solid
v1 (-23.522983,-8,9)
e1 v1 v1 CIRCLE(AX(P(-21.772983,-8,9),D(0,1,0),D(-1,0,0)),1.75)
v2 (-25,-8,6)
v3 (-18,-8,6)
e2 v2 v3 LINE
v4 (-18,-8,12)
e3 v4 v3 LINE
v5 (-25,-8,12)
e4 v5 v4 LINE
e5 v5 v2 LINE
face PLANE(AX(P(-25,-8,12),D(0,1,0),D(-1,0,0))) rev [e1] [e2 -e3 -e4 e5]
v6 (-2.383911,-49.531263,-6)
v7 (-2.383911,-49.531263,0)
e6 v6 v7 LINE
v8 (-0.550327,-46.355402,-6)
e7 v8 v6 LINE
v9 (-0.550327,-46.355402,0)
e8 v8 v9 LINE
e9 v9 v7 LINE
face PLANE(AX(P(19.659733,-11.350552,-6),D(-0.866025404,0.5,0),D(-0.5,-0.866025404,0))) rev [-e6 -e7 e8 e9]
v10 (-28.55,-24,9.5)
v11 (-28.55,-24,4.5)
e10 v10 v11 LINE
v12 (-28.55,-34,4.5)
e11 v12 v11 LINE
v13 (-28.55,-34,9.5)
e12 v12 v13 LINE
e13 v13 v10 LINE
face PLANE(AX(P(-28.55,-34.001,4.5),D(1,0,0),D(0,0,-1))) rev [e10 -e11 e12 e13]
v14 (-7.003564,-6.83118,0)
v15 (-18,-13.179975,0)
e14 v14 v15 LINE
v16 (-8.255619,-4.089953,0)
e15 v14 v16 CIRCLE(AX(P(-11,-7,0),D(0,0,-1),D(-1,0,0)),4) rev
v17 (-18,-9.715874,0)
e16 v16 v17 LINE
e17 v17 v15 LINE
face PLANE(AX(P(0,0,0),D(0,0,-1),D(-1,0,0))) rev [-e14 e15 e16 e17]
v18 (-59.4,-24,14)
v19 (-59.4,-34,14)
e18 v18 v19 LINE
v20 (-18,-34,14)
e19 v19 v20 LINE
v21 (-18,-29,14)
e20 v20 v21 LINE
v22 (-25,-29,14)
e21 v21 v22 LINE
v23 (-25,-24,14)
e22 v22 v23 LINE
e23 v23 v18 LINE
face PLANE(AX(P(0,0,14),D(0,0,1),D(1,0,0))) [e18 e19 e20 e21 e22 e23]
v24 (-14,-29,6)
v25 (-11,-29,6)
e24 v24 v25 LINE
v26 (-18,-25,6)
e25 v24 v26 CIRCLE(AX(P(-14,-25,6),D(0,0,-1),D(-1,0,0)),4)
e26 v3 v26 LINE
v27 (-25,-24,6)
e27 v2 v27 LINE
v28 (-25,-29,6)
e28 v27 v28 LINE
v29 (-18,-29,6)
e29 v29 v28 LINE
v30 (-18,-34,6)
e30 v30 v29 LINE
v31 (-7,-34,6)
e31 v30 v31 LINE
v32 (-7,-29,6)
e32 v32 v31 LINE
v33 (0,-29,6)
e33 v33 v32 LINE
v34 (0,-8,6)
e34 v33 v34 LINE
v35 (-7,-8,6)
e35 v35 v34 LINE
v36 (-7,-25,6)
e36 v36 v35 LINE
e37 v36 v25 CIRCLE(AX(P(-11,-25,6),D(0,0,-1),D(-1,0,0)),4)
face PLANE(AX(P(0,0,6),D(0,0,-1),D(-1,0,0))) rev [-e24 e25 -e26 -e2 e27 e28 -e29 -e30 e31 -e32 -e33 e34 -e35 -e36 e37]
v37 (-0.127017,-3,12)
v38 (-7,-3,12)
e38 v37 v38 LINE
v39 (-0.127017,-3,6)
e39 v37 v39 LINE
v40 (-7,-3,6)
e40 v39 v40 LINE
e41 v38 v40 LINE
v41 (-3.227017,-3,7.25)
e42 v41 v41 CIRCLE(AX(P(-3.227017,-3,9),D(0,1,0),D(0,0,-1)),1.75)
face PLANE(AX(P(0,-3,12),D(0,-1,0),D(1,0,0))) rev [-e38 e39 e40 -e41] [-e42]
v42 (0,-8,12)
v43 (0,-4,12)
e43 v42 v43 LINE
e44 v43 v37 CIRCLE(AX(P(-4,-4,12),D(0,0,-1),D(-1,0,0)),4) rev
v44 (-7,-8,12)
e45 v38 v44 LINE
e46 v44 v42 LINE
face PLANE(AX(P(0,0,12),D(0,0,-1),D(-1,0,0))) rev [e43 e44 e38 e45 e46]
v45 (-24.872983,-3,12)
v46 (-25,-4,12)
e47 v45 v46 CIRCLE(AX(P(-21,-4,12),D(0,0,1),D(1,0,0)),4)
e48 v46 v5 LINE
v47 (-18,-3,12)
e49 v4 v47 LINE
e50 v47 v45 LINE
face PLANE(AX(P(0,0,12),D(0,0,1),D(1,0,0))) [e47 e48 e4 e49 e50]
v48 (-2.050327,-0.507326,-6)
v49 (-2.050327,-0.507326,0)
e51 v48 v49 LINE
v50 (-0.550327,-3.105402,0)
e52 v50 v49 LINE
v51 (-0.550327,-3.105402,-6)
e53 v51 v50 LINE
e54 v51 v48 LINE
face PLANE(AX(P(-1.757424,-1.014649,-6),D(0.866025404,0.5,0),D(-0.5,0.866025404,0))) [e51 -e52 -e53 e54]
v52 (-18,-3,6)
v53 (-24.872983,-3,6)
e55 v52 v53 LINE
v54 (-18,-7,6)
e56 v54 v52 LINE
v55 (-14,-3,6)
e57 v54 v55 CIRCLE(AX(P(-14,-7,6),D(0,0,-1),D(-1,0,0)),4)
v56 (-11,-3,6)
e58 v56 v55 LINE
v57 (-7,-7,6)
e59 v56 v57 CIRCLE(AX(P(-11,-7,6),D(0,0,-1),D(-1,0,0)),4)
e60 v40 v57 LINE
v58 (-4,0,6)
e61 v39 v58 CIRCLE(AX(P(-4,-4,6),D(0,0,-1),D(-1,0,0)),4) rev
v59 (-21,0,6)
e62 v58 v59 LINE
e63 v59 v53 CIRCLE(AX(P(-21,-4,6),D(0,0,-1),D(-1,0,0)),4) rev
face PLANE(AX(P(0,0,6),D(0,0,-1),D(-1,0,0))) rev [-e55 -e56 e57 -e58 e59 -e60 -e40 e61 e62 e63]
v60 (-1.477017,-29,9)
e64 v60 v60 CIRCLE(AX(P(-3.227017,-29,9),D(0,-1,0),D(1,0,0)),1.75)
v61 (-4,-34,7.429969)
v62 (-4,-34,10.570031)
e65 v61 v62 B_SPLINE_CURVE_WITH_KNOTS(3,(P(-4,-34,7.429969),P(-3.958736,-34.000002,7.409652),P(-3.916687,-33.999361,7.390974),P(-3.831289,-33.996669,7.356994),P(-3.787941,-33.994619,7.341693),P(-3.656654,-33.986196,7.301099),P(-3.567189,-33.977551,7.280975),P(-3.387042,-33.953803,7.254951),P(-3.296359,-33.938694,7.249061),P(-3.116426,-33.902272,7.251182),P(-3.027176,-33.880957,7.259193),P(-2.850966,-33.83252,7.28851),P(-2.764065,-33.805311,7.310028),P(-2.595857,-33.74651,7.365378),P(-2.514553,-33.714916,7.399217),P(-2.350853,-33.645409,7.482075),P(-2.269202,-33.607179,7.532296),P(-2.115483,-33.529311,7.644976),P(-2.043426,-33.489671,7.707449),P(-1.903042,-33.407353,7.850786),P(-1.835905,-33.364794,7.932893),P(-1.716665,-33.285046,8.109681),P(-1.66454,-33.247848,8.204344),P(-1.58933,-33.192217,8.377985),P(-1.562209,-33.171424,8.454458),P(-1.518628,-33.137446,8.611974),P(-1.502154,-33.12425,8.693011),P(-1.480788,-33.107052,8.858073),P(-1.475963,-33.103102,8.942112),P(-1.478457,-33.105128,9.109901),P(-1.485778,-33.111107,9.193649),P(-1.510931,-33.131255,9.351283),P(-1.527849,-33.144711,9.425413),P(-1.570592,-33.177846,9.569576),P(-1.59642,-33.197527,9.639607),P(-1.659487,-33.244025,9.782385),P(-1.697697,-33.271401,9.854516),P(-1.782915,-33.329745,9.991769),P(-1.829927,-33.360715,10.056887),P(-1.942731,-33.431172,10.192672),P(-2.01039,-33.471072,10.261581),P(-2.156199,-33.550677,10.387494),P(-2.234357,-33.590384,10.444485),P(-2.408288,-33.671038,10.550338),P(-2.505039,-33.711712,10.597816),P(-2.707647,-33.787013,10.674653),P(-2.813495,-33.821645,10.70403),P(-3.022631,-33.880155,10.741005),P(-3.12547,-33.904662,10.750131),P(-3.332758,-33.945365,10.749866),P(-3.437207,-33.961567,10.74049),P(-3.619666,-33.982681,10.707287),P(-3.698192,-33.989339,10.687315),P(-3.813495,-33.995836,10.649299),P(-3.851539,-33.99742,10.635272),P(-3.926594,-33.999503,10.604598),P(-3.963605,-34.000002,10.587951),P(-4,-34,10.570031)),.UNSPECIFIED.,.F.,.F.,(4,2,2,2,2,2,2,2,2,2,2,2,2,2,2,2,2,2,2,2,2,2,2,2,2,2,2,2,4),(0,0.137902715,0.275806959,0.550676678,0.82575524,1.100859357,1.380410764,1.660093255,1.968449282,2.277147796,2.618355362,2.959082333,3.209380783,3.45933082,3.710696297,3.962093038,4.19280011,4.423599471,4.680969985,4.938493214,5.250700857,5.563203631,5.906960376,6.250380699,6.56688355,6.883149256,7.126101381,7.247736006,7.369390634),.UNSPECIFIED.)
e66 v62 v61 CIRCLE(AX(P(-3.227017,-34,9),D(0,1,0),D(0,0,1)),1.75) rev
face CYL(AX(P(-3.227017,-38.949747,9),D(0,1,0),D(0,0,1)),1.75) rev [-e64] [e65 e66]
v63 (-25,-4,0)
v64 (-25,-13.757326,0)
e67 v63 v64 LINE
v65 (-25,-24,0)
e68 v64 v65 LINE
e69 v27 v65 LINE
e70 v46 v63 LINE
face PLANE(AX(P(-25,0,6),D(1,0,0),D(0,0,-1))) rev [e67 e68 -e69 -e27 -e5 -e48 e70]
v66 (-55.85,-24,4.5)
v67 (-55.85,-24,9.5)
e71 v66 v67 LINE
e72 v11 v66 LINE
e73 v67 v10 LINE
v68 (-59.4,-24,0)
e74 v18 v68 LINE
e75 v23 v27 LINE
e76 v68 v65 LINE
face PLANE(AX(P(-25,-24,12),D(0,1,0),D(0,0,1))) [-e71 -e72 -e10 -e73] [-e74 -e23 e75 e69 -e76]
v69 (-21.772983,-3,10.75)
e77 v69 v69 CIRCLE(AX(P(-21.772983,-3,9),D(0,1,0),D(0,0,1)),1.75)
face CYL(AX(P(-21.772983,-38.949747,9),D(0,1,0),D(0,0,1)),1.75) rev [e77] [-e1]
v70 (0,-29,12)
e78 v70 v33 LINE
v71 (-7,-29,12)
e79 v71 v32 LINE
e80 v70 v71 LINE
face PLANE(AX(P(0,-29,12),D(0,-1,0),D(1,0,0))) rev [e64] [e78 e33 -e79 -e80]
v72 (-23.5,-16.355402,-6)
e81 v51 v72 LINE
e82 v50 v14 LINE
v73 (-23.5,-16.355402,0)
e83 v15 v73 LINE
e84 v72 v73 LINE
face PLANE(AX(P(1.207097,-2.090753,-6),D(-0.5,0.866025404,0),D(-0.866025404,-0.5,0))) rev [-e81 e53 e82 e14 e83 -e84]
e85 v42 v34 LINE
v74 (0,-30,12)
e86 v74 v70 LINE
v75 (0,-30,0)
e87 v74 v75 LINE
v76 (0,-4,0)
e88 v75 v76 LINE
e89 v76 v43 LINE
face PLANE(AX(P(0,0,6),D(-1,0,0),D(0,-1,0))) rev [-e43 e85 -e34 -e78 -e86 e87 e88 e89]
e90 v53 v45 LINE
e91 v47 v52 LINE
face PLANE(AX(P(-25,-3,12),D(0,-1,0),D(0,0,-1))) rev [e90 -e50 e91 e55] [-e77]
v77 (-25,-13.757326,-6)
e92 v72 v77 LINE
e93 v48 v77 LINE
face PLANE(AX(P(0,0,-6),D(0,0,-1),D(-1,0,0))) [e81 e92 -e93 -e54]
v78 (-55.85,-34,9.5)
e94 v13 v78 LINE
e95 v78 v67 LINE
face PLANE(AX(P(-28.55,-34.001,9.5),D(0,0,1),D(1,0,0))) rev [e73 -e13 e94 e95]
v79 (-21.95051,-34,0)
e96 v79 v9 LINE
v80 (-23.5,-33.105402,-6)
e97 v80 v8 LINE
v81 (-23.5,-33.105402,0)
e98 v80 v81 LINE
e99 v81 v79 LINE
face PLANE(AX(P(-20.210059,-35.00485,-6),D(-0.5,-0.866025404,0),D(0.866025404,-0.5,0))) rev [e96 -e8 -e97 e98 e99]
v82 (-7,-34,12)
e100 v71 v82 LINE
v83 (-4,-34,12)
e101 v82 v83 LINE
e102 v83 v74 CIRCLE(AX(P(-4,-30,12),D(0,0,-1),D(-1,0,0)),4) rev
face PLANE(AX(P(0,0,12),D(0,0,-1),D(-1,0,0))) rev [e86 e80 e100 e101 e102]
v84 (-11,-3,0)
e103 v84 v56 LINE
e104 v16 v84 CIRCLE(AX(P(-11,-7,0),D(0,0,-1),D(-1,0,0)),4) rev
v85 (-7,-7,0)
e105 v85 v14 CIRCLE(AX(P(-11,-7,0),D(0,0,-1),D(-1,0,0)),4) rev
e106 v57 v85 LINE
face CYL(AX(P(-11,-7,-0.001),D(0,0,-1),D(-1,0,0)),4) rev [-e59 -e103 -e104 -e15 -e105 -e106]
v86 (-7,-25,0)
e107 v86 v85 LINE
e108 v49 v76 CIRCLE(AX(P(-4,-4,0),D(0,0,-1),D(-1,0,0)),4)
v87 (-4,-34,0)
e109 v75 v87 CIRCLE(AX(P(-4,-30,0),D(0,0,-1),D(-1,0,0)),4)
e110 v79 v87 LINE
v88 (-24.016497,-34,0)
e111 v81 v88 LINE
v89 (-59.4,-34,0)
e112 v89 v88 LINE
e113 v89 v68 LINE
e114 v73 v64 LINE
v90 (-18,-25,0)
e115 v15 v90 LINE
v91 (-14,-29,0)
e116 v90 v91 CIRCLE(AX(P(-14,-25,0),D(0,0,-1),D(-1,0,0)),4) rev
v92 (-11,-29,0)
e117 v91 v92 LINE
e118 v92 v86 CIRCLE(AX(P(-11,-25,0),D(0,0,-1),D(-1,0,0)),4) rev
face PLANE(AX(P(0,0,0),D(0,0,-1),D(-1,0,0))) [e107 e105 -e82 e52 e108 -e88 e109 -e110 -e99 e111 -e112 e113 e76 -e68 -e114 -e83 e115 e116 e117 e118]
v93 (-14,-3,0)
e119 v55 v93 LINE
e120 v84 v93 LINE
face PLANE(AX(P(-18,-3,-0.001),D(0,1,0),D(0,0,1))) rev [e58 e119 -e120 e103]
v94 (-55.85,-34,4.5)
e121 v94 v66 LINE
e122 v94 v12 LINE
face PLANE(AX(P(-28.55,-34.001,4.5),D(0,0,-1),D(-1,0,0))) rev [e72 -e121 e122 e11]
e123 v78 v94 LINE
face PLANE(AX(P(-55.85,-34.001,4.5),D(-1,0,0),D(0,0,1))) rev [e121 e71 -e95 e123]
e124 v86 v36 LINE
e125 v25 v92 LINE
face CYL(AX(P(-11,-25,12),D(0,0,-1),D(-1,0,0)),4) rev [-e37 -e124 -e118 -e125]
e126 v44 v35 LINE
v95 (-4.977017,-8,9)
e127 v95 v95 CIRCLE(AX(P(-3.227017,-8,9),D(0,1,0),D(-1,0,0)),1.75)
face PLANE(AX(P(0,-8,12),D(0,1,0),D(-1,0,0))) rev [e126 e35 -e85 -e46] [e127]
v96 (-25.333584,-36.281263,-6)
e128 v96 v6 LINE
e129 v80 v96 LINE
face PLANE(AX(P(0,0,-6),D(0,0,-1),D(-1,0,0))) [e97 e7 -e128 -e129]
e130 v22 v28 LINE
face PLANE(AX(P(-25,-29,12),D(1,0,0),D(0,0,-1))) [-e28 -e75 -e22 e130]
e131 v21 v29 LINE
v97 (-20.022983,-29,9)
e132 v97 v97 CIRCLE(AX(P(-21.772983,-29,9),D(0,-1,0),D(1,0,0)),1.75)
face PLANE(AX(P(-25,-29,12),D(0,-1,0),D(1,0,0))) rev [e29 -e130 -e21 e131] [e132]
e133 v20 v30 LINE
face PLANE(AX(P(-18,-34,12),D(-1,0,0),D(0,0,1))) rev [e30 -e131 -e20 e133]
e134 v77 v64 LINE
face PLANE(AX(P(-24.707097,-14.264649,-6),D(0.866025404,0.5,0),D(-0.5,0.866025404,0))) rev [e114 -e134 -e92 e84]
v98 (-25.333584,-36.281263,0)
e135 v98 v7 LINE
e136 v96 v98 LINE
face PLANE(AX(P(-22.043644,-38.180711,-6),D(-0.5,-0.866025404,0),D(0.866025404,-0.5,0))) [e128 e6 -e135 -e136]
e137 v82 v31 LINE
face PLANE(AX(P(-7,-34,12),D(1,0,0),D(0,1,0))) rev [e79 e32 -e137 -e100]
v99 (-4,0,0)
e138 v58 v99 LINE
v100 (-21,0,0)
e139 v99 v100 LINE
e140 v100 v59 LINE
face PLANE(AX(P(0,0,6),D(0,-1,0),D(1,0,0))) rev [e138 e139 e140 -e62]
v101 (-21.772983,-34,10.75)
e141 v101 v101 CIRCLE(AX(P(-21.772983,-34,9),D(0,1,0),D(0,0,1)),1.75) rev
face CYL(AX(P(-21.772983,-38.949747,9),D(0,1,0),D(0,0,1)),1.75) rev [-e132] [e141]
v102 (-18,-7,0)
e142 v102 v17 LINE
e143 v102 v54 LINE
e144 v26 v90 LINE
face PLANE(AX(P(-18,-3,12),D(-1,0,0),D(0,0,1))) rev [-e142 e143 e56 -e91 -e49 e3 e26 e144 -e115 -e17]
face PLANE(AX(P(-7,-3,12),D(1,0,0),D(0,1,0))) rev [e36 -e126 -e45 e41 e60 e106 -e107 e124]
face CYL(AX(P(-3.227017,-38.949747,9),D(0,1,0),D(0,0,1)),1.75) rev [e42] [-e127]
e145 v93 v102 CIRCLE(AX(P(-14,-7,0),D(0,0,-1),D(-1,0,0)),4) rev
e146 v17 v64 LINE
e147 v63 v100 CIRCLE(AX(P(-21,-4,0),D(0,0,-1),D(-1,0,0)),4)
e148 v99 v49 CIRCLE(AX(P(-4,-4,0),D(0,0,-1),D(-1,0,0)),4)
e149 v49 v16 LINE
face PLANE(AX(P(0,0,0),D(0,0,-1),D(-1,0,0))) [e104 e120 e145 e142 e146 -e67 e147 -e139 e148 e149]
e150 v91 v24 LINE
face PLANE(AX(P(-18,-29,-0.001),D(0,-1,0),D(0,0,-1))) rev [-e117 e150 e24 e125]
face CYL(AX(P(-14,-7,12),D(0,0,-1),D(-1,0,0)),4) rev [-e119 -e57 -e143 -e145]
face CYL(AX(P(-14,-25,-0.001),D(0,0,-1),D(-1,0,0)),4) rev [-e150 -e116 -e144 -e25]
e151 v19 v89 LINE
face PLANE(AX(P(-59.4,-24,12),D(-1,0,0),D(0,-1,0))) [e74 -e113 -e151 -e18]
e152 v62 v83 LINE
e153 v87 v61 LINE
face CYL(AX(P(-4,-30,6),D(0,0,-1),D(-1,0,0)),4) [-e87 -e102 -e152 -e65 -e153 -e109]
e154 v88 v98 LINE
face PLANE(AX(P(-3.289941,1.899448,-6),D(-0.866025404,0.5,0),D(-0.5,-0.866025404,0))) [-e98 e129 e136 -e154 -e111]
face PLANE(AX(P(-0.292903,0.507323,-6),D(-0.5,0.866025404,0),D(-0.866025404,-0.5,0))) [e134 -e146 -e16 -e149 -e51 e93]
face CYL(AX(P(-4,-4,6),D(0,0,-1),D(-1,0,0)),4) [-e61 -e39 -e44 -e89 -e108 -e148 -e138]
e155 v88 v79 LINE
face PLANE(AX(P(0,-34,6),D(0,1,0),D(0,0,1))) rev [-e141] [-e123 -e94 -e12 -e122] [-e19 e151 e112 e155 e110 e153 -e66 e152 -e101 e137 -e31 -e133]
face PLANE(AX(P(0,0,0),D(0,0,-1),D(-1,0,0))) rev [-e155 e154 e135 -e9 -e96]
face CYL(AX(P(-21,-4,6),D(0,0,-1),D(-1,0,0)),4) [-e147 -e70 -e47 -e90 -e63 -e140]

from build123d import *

# Parameters (mm, degrees)
CROQUIS1_W              = 25
CROQUIS1_H              = 34
SALIENTE_EXTRUIR1_DEPTH = 6
CROQUIS2_W              = 7
CROQUIS2_H              = 5
SALIENTE_EXTRUIR2_DEPTH = 6
CORTAR_EXTRUIR1_REACH   = 44.626
CROQUIS3_W              = 11
CROQUIS3_H              = 26
REDONDEO1_R             = 4
SALIENTE_EXTRUIR3_DEPTH = 12
SALIENTE_EXTRUIR4_DEPTH = 2
CORTAR_EXTRUIR2_REACH   = 70.45
CROQUIS7_R              = 1.75
CORTAR_EXTRUIR3_REACH   = 67.577
CROQUIS8_W              = 27.3
CROQUIS8_H              = 5
SALIENTE_EXTRUIR5_DEPTH = 6


with BuildPart() as part:
    # Croquis1 → Saliente-Extruir1 (new body)
    with BuildSketch(Plane.XY):
        with Locations((-12.5, -17)):
            Rectangle(CROQUIS1_W, CROQUIS1_H)
    extrude(amount=SALIENTE_EXTRUIR1_DEPTH)

    # Croquis2 → Saliente-Extruir2 (add)
    with BuildSketch(Plane.XY.offset(6)):
        with Locations((-21.5, -5.5)):
            Rectangle(CROQUIS2_W, CROQUIS2_H)
        with Locations((-3.5, -5.5)):
            Rectangle(CROQUIS2_W, CROQUIS2_H)
        with Locations((-3.5, -31.5)):
            Rectangle(CROQUIS2_W, CROQUIS2_H)
        with Locations((-21.5, -31.5)):
            Rectangle(CROQUIS2_W, CROQUIS2_H)
    extrude(amount=SALIENTE_EXTRUIR2_DEPTH)

    # Croquis3 → Cortar-Extruir1 (cut, up to next)
    with BuildSketch(Plane.XY.offset(6), mode=Mode.PRIVATE) as cortar_extruir1_sk1:
        with Locations((-12.5, -16)):
            Rectangle(CROQUIS3_W, CROQUIS3_H)
    cortar_extruir1_tool1 = extrude(cortar_extruir1_sk1.sketch, amount=-CORTAR_EXTRUIR1_REACH, mode=Mode.PRIVATE) & part.part
    add(cortar_extruir1_tool1.solids().sort_by_distance((-12.5, -16, 6))[0], mode=Mode.SUBTRACT)

    # Redondeo1
    # the kernel refuses this fillet: 4 mm, written as the material it adds along each edge
    with BuildSketch(Plane(origin=(-18, -29, 6), x_dir=(0, 1, 0), z_dir=(0, 0, -1)), Plane(origin=(-7, -29, 6), x_dir=(-1, 0, 0), z_dir=(0, 0, -1)), Plane(origin=(-18, -3, 6), x_dir=(1, 0, 0), z_dir=(0, 0, -1))) as redondeo1_piece_1:
        with BuildLine():
            CenterArc((REDONDEO1_R, REDONDEO1_R), REDONDEO1_R, 180, 90)
            Line((0, REDONDEO1_R), (0, 0))
            Line((0, 0), (REDONDEO1_R, 0))
        make_face()
    extrude(amount=6)
    with BuildSketch(Plane(origin=(-7, -3, 6), x_dir=(-1, 0, 0), z_dir=(0, 0, -1))) as redondeo1_piece_2:
        with BuildLine():
            CenterArc((REDONDEO1_R, -REDONDEO1_R), REDONDEO1_R, 90, 90)
            Line((0, -REDONDEO1_R), (0, 0))
            Line((0, 0), (REDONDEO1_R, 0))
        make_face()
    extrude(amount=6)
    # the kernel refuses this fillet: 4 mm, written as the material it takes off along each edge
    with BuildSketch(Plane(origin=(0, 0, -10), x_dir=(-1, 0, 0), z_dir=(0, 0, 1))) as redondeo1_2_piece_1:
        with BuildLine():
            CenterArc((REDONDEO1_R, REDONDEO1_R), REDONDEO1_R, 180, 90)
            Line((0, REDONDEO1_R), (0, 0))
            Line((0, 0), (REDONDEO1_R, 0))
        make_face()
    extrude(amount=26, mode=Mode.SUBTRACT)
    with BuildSketch(Plane(origin=(0, -34, 22), x_dir=(0, 1, 0), z_dir=(0, 0, -1)), Plane(origin=(-25, -34, -10), x_dir=(0, 1, 0), z_dir=(0, 0, 1))) as redondeo1_2_piece_2:
        with BuildLine():
            CenterArc((REDONDEO1_R, -REDONDEO1_R), REDONDEO1_R, 90, 90)
            Line((0, -REDONDEO1_R), (0, 0))
            Line((0, 0), (REDONDEO1_R, 0))
        make_face()
    extrude(amount=32, mode=Mode.SUBTRACT)
    with BuildSketch(Plane(origin=(-25, 0, -10), x_dir=(1, 0, 0), z_dir=(0, 0, 1))) as redondeo1_2_piece_3:
        with BuildLine():
            CenterArc((REDONDEO1_R, -REDONDEO1_R), REDONDEO1_R, 90, 90)
            Line((0, -REDONDEO1_R), (0, 0))
            Line((0, 0), (REDONDEO1_R, 0))
        make_face()
    extrude(amount=26, mode=Mode.SUBTRACT)

    # Croquis5 → Saliente-Extruir3 (add)
    with BuildSketch(Plane(origin=(0, 0, 0), x_dir=(-1, 0, 0), z_dir=(0, 0, -1))):
        with BuildLine():
            Line((25, -29), (25, -30))
            ThreePointArc((25, -30), (23.828427125, -32.828427125), (21, -34))
            Line((21, -34), (25, -34))
            Line((25, -34), (59.4, -34))
            Line((59.4, -34), (59.4, -24))
            Line((59.4, -24), (25, -24))
            Line((25, -24), (25, -29))
        make_face()
    extrude(amount=-SALIENTE_EXTRUIR3_DEPTH)

    # Croquis6 → Saliente-Extruir4 (add)
    with BuildSketch(Plane.XY.offset(12)):
        Polygon((-18, -29), (-25, -29), (-25, -24), (-59.4, -24), (-59.4, -34), (-18, -34), align=None)
    extrude(amount=SALIENTE_EXTRUIR4_DEPTH)

    # Cortar-Extruir2: up to this face of the body (flat: up to its plane)
    cortar_extruir2_end = Plane(part.part.faces().sort_by_distance((-34.409507042, -34, 6.559859155))[0])
    # Croquis7 → Cortar-Extruir2 (cut, up to the picked face)
    with BuildSketch(Plane(origin=(0, -3, 0), x_dir=(1, 0, 0), z_dir=(0, 1, 0)), mode=Mode.PRIVATE) as cortar_extruir2_sk1:
        with Locations(Location((-21.772983346, -9, 0), (0, 0, 270))):
            Circle(CROQUIS7_R)
    cortar_extruir2_tool1 = split(extrude(cortar_extruir2_sk1.sketch, amount=-CORTAR_EXTRUIR2_REACH, mode=Mode.PRIVATE), bisect_by=cortar_extruir2_end, keep=Keep.BOTH, mode=Mode.PRIVATE)
    # Croquis7 → Cortar-Extruir2 (cut, up to the picked face)
    with BuildSketch(Plane(origin=(0, -3, 0), x_dir=(1, 0, 0), z_dir=(0, 1, 0)), mode=Mode.PRIVATE) as cortar_extruir2_sk2:
        with Locations(Location((-3.227016654, -9, 0), (0, 0, 243.787297197))):
            Circle(CROQUIS7_R)
    cortar_extruir2_tool2 = split(extrude(cortar_extruir2_sk2.sketch, amount=-CORTAR_EXTRUIR2_REACH, mode=Mode.PRIVATE), bisect_by=cortar_extruir2_end, keep=Keep.BOTH, mode=Mode.PRIVATE)
    add(cortar_extruir2_tool1.solids().sort_by(Axis((-21.772983, -3, 9), (0, -1, 0)))[0], mode=Mode.SUBTRACT)
    add(cortar_extruir2_tool2.solids().sort_by(Axis((-3.227017, -3, 9), (0, -1, 0)))[0], mode=Mode.SUBTRACT)

    # Croquis8 → Cortar-Extruir3 (cut, up to next)
    with BuildSketch(Plane(origin=(0, -24, 0), x_dir=(1, 0, 0), z_dir=(0, 1, 0)), mode=Mode.PRIVATE) as cortar_extruir3_sk1:
        with Locations((-42.2, -7)):
            Rectangle(CROQUIS8_W, CROQUIS8_H)
    cortar_extruir3_tool1 = extrude(cortar_extruir3_sk1.sketch, amount=-CORTAR_EXTRUIR3_REACH, mode=Mode.PRIVATE) & part.part
    add(cortar_extruir3_tool1.solids().sort_by_distance((-42.2, -24, 7))[0], mode=Mode.SUBTRACT)

    # Croquis9 → Saliente-Extruir5 (add)
    with BuildSketch(Plane(origin=(0, 0, 0), x_dir=(-1, 0, 0), z_dir=(0, 0, -1))):
        Polygon((2.0503268, -0.507325607), (25, -13.757325607), (23.5, -16.355401819), (17.437822174, -12.855401819), (6.612504626, -6.605401819), (0.5503268, -3.105401819), align=None)
        Polygon((25.33358423, -36.281262865), (2.38391103, -49.531262865), (0.5503268, -46.355401819), (6.612504626, -42.855401819), (17.437822174, -36.605401819), (23.5, -33.105401819), align=None)
    extrude(amount=SALIENTE_EXTRUIR5_DEPTH)


solid = part.part
